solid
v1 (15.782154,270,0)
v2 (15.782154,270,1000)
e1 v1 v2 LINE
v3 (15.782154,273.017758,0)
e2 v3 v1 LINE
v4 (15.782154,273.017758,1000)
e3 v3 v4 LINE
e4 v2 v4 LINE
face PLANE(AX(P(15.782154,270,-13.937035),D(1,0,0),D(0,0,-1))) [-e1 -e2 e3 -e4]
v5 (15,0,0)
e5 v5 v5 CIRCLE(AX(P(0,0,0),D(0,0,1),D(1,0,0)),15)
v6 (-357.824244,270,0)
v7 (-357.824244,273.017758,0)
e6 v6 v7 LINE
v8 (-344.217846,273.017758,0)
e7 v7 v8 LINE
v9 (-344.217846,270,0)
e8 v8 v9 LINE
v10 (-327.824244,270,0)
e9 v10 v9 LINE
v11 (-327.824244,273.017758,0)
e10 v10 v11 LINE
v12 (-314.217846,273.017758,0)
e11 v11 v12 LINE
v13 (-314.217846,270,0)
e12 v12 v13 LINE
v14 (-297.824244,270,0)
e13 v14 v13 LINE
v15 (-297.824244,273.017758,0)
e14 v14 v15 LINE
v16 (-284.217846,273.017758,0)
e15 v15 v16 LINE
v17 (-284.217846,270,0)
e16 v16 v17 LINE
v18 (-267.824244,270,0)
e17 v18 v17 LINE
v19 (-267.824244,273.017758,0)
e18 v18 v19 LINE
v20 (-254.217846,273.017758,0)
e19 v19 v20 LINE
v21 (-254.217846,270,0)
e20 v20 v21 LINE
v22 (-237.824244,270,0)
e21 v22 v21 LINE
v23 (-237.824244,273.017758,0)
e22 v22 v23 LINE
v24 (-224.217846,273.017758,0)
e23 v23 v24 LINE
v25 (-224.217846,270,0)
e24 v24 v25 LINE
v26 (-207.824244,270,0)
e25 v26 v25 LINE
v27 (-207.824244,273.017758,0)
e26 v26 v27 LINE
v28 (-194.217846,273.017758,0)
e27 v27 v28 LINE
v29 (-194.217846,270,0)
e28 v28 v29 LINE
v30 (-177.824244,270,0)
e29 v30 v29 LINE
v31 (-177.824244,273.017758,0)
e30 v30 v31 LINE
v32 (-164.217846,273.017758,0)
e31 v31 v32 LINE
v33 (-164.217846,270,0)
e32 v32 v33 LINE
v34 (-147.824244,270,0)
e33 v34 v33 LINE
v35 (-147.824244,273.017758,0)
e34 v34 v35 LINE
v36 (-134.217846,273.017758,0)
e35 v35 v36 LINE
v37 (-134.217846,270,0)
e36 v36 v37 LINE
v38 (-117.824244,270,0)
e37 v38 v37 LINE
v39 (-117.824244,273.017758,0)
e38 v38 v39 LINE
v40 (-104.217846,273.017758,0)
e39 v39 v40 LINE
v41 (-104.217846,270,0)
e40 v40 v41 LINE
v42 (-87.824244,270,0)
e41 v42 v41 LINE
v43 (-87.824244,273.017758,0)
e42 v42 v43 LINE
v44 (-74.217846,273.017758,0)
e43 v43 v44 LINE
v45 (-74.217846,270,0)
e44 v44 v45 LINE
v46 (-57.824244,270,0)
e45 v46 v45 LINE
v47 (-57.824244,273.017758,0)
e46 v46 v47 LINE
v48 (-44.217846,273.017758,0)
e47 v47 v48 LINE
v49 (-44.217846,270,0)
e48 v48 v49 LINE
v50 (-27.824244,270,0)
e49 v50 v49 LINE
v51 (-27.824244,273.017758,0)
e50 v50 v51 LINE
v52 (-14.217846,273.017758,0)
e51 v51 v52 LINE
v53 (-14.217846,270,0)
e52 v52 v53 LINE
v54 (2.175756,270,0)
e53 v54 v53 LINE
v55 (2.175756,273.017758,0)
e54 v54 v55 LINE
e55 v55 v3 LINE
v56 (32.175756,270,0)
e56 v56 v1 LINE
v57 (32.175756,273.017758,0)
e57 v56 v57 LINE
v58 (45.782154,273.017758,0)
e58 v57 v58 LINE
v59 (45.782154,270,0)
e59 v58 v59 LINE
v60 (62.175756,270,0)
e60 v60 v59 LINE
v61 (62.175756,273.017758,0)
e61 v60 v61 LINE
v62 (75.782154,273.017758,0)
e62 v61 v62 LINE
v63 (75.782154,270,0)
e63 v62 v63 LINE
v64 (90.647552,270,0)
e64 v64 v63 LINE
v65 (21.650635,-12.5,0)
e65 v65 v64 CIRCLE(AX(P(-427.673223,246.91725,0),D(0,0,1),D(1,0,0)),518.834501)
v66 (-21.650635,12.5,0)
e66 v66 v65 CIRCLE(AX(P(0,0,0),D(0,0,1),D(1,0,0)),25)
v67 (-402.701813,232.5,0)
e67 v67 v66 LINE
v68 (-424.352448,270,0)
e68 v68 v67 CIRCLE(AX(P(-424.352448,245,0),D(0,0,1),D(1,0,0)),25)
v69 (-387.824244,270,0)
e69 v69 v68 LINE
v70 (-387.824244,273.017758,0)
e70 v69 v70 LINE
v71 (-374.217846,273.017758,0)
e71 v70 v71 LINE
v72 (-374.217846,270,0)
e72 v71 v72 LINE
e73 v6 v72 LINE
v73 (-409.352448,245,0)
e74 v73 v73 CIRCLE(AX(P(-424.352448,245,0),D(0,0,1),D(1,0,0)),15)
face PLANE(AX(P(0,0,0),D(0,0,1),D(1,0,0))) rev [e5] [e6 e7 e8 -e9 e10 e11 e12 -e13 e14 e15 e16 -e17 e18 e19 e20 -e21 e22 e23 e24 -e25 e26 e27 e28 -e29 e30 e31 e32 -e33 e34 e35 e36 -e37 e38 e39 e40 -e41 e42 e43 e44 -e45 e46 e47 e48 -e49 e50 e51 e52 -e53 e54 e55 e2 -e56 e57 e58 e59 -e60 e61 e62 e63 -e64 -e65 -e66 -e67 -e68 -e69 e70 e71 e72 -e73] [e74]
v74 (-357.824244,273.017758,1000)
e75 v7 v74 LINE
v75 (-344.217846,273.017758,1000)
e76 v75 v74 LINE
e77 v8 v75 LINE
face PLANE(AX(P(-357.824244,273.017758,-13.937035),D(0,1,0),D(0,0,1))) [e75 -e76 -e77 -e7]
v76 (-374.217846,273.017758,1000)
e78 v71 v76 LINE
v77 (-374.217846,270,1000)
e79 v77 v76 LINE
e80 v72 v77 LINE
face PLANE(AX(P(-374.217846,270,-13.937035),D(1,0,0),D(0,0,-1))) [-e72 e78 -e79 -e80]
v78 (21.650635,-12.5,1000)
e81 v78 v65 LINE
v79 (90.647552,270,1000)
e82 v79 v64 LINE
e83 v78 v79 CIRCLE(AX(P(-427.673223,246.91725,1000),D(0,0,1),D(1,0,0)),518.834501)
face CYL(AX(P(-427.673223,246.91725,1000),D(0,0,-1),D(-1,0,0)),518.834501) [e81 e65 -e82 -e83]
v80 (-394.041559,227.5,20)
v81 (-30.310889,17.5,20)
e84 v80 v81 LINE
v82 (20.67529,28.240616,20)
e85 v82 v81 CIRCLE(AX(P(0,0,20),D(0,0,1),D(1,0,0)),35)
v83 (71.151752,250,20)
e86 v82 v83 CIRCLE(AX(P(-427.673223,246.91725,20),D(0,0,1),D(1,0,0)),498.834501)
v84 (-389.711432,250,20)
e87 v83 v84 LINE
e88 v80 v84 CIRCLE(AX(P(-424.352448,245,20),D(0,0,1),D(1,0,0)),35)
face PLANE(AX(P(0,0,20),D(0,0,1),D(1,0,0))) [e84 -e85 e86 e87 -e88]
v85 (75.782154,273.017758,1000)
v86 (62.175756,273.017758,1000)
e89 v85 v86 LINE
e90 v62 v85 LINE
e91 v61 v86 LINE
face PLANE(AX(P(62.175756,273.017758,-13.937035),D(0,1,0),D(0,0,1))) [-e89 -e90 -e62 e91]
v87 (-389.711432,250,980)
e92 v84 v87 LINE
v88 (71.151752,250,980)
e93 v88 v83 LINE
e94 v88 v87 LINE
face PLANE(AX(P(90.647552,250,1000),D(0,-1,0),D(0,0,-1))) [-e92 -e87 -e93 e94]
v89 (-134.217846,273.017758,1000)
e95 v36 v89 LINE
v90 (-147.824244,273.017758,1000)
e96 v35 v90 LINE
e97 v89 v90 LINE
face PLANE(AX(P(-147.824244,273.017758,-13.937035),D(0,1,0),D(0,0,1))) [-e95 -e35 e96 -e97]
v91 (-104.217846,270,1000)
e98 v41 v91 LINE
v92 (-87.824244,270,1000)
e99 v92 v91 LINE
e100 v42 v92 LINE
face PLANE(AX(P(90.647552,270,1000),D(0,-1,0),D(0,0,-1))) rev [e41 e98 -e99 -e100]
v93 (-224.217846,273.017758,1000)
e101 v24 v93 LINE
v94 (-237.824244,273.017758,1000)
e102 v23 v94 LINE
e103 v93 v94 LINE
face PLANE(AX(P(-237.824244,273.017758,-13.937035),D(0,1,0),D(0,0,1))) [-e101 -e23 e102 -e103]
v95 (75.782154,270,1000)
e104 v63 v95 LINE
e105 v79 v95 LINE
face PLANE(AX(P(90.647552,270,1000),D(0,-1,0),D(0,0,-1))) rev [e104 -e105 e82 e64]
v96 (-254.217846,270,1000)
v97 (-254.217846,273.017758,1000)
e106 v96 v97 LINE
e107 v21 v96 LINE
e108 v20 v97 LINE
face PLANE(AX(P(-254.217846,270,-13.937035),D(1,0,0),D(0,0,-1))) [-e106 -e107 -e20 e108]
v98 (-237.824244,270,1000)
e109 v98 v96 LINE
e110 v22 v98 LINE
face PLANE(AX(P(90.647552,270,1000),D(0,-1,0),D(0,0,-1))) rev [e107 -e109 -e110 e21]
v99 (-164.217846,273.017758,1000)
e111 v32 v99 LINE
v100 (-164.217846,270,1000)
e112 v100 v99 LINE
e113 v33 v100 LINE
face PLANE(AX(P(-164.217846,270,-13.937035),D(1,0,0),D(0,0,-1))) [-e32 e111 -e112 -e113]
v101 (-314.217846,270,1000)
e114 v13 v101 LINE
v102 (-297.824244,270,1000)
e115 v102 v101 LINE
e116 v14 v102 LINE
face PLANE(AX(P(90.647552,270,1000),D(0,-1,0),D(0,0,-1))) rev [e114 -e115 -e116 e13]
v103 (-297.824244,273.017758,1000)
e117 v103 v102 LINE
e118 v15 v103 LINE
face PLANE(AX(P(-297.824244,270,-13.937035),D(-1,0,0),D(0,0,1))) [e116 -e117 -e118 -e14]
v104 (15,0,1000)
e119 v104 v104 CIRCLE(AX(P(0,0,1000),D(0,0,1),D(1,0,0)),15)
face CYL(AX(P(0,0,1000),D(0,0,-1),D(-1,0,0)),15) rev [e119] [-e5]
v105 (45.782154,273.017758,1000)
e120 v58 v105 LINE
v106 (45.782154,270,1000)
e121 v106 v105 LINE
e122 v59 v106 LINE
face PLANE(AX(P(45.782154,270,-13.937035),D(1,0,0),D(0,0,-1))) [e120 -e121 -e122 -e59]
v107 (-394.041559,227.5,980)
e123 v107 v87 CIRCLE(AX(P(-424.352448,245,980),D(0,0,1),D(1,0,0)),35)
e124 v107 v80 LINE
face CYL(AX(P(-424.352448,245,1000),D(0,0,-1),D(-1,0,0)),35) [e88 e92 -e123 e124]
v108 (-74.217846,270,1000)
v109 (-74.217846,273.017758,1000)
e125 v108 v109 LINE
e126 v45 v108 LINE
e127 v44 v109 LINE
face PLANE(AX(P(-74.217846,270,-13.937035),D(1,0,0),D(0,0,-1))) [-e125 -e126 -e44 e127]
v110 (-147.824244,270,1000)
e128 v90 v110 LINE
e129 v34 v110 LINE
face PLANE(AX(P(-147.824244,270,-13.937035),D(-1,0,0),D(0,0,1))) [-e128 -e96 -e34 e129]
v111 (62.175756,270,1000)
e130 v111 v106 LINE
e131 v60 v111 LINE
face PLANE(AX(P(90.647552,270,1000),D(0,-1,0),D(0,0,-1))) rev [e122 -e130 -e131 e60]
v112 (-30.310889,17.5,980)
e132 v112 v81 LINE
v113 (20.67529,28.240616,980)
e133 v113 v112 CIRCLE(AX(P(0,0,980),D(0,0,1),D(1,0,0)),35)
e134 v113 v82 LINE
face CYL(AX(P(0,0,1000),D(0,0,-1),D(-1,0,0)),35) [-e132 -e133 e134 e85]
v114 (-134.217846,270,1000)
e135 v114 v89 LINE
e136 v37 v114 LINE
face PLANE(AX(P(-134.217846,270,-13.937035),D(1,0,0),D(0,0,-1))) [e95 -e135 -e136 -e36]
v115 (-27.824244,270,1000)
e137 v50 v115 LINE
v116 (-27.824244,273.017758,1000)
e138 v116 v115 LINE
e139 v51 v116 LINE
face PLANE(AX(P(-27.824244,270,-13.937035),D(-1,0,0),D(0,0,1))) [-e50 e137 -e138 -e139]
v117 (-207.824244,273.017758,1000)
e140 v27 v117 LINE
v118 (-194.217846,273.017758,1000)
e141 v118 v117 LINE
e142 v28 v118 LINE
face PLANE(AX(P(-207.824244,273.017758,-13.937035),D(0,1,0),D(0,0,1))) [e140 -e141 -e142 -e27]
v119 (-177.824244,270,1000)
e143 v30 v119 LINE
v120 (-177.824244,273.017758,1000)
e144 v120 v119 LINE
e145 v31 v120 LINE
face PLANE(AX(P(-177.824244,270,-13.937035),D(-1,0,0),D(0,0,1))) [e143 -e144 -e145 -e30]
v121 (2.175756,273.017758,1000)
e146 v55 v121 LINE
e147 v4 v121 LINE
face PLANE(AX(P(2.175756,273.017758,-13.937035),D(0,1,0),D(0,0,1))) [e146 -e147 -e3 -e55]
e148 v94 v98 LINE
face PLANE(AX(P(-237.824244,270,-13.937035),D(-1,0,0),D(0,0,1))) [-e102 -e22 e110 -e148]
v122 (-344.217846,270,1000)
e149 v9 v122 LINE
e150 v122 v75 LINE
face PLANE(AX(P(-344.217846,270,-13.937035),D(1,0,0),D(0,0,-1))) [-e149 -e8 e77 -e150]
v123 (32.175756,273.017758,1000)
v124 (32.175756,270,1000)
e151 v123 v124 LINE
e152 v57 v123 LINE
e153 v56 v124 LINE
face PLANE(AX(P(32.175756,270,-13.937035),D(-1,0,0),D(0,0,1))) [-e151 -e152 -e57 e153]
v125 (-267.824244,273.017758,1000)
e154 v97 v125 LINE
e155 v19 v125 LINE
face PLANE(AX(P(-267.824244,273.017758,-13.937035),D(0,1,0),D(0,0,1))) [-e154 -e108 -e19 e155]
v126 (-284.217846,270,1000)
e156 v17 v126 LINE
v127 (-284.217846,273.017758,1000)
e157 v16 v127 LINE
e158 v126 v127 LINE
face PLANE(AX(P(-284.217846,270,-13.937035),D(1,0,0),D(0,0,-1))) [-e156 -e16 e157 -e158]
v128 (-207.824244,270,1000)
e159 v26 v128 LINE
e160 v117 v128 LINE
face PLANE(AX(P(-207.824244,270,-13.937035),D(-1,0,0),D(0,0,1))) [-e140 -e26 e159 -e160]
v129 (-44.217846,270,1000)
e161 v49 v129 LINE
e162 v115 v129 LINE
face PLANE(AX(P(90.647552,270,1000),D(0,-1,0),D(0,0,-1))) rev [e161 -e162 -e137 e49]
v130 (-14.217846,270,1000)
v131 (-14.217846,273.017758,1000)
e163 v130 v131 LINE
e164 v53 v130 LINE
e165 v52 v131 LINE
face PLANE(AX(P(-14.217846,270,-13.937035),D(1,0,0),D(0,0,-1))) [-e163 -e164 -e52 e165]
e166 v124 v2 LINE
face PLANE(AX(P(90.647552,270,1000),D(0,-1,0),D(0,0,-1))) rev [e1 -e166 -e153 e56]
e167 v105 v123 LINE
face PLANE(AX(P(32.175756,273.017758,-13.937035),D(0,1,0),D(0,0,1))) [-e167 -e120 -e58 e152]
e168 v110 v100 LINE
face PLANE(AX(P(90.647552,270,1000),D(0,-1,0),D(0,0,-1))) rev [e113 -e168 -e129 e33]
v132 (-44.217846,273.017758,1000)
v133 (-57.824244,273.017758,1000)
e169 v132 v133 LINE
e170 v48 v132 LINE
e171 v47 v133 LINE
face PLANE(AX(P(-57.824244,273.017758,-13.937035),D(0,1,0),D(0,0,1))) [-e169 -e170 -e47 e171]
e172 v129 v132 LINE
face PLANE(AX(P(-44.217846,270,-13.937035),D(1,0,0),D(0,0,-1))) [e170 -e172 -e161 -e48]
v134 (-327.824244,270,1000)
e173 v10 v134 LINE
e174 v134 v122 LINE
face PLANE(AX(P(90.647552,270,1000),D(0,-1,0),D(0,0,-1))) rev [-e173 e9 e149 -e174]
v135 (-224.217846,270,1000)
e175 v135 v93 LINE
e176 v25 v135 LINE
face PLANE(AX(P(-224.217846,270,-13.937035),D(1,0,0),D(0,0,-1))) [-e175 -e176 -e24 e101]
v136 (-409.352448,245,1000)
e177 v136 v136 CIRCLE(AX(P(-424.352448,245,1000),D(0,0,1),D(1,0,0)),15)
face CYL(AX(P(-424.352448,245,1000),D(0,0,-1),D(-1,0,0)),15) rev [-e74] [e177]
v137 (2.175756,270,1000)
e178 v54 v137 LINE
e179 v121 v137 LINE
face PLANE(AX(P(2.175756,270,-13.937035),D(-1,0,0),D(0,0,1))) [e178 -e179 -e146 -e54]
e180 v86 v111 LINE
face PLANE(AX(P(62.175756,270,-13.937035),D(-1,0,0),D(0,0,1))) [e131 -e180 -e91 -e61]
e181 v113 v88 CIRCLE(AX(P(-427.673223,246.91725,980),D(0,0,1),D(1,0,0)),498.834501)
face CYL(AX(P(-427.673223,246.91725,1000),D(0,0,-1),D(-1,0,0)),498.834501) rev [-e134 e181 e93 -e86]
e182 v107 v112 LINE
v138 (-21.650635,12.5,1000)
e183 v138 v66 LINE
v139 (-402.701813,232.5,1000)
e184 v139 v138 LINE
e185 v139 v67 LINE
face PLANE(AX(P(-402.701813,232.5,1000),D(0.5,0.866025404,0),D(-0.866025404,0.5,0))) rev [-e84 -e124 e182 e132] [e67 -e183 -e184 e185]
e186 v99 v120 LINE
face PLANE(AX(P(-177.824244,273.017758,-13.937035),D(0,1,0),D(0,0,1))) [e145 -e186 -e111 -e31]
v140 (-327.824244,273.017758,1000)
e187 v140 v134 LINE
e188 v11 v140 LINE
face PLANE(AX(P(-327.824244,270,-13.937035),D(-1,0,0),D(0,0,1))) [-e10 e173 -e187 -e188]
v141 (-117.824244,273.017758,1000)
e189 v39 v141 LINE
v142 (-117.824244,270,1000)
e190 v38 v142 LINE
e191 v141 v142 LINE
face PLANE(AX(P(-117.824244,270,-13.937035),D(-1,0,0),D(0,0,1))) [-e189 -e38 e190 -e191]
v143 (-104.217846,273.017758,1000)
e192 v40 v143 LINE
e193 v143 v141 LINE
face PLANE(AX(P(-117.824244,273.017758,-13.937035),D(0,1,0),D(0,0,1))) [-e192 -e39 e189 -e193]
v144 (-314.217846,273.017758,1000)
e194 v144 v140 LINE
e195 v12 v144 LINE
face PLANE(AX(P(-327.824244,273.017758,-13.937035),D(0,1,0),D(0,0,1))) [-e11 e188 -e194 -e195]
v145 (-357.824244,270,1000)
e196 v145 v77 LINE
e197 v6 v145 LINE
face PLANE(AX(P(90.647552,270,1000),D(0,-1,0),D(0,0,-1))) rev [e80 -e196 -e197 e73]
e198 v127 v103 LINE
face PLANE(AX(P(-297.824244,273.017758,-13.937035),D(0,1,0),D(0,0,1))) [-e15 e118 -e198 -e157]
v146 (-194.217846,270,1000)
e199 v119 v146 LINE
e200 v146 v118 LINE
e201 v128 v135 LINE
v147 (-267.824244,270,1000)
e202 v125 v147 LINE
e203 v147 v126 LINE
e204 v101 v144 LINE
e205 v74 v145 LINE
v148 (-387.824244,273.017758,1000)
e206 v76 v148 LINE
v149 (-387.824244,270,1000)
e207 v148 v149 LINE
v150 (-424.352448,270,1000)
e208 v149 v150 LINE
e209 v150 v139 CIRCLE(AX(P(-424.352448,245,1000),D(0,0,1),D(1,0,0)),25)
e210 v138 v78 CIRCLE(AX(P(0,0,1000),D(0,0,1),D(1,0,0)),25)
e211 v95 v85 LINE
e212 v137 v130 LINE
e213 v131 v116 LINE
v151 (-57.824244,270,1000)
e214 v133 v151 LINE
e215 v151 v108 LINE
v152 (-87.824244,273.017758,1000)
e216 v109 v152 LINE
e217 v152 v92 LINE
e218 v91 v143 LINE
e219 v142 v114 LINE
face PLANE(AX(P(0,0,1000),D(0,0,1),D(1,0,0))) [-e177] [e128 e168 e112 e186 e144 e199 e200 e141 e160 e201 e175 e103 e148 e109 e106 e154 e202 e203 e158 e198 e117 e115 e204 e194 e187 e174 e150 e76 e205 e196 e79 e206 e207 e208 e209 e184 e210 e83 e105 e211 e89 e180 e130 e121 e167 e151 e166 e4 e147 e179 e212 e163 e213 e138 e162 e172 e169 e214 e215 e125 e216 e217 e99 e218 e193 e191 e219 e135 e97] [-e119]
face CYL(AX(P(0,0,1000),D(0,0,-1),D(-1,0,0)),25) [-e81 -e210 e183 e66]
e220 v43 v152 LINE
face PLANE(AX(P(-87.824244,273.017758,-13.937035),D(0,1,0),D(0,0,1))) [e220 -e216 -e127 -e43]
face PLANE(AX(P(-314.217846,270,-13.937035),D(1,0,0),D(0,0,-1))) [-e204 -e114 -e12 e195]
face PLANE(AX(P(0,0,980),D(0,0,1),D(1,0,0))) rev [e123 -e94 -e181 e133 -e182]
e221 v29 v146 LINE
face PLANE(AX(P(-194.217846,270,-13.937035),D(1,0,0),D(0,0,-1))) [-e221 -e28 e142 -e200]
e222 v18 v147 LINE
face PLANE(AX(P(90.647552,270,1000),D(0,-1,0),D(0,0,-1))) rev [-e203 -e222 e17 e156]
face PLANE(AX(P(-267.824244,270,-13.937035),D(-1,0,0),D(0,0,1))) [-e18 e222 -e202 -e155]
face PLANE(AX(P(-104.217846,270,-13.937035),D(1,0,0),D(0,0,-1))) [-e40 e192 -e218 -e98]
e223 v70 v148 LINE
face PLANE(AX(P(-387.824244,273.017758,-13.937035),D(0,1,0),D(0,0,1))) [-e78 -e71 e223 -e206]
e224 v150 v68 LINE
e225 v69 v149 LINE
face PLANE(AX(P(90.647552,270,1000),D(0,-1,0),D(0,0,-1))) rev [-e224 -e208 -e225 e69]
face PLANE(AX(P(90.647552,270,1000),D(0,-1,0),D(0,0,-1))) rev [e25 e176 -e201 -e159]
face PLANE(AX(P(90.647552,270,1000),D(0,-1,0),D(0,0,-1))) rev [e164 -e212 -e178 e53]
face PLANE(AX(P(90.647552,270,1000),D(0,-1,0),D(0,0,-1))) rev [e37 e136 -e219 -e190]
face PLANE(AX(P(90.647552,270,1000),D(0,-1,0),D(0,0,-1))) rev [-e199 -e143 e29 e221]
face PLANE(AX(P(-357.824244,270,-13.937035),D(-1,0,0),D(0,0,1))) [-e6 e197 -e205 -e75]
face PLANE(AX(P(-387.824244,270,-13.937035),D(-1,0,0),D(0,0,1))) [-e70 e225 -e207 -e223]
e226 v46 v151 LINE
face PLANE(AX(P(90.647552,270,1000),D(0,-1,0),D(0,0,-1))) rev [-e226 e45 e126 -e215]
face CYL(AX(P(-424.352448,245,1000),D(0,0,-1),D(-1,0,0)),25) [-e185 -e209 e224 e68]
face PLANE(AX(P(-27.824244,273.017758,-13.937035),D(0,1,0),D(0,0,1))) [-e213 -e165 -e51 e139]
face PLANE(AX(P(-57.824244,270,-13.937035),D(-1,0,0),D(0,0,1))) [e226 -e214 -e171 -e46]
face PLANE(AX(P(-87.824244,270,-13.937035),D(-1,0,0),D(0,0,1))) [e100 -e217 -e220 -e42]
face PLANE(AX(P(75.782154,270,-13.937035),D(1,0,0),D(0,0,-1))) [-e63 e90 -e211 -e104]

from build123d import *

# Parameters (mm, degrees)
SKETCH1_R           = 15
BOSS_EXTRUDE1_DEPTH = 1000
SKETCH2_W           = 13.606398545
SKETCH2_H           = 3.01775833
BOSS_EXTRUDE2_DEPTH = 1000
SHELL1_START        = 20
SHELL1_DEPTH        = 960


# Read off the part's stored shape, not the designer's step: Shell1
with BuildPart() as part:
    # Sketch1 → Boss-Extrude1 (new body)
    with BuildSketch(Plane.XY):
        with BuildLine():
            Line((90.647552146, 270), (-424.352447854, 270))
            ThreePointArc((-424.352447854, 270), (-446.003082949, 232.5), (-402.70181276, 232.5))
            Line((-402.70181276, 232.5), (-21.650635095, 12.5))
            ThreePointArc((-21.650635095, 12.5), (-12.5, -21.650635095), (21.650635095, -12.5))
            ThreePointArc((21.650635095, -12.5), (76.346217655, 123.817117551), (90.647552146, 270))
        make_face()
        with Locations((-424.352447854, 245)):
            Circle(SKETCH1_R, mode=Mode.SUBTRACT)
        Circle(SKETCH1_R, mode=Mode.SUBTRACT)
    extrude(amount=BOSS_EXTRUDE1_DEPTH)

    # Sketch2 → Boss-Extrude2 (add)
    with BuildSketch(Plane.XY.offset(1000)):
        with Locations((-381.021044878, 271.508879165)):
            Rectangle(SKETCH2_W, SKETCH2_H)
        with Locations((-351.021044878, 271.508879165)):
            Rectangle(SKETCH2_W, SKETCH2_H)
        with Locations((-321.021044878, 271.508879165)):
            Rectangle(SKETCH2_W, SKETCH2_H)
        with Locations((-291.021044878, 271.508879165)):
            Rectangle(SKETCH2_W, SKETCH2_H)
        with Locations((-261.021044878, 271.508879165)):
            Rectangle(SKETCH2_W, SKETCH2_H)
        with Locations((-231.021044879, 271.508879165)):
            Rectangle(SKETCH2_W, SKETCH2_H)
        with Locations((-201.021044879, 271.508879165)):
            Rectangle(SKETCH2_W, SKETCH2_H)
        with Locations((-171.021044878, 271.508879165)):
            Rectangle(SKETCH2_W, SKETCH2_H)
        with Locations((-141.021044878, 271.508879165)):
            Rectangle(SKETCH2_W, SKETCH2_H)
        with Locations((-111.021044879, 271.508879165)):
            Rectangle(SKETCH2_W, SKETCH2_H)
        with Locations((-81.021044879, 271.508879165)):
            Rectangle(SKETCH2_W, SKETCH2_H)
        with Locations((-51.021044879, 271.508879165)):
            Rectangle(SKETCH2_W, SKETCH2_H)
        with Locations((-21.021044878, 271.508879165)):
            Rectangle(SKETCH2_W, SKETCH2_H)
        with Locations((8.978955122, 271.508879165)):
            Rectangle(SKETCH2_W, SKETCH2_H)
        with Locations((38.978955122, 271.508879165)):
            Rectangle(SKETCH2_W, SKETCH2_H)
        with Locations((68.978955122, 271.508879165)):
            Rectangle(SKETCH2_W, SKETCH2_H)
    extrude(amount=-BOSS_EXTRUDE2_DEPTH)

    # Shell1 outline → Shell1 (cut)
    with BuildSketch(Plane.XY.offset(SHELL1_START)):
        with BuildLine():
            ThreePointArc((20.675289686, 28.240616077), (58.720352341, 136.205240665), (71.151752213, 250))
            Line((71.151752213, 250), (-389.711431703, 250))
            ThreePointArc((-389.711431703, 250), (-389.983130142, 238.385621722), (-394.041558722, 227.5))
            Line((-394.041558722, 227.5), (-30.310889132, 17.5))
            ThreePointArc((-30.310889132, 17.5), (-7.214665799, 34.248337148), (20.675289686, 28.240616077))
        make_face()
    extrude(amount=SHELL1_DEPTH, mode=Mode.SUBTRACT)


solid = part.part
